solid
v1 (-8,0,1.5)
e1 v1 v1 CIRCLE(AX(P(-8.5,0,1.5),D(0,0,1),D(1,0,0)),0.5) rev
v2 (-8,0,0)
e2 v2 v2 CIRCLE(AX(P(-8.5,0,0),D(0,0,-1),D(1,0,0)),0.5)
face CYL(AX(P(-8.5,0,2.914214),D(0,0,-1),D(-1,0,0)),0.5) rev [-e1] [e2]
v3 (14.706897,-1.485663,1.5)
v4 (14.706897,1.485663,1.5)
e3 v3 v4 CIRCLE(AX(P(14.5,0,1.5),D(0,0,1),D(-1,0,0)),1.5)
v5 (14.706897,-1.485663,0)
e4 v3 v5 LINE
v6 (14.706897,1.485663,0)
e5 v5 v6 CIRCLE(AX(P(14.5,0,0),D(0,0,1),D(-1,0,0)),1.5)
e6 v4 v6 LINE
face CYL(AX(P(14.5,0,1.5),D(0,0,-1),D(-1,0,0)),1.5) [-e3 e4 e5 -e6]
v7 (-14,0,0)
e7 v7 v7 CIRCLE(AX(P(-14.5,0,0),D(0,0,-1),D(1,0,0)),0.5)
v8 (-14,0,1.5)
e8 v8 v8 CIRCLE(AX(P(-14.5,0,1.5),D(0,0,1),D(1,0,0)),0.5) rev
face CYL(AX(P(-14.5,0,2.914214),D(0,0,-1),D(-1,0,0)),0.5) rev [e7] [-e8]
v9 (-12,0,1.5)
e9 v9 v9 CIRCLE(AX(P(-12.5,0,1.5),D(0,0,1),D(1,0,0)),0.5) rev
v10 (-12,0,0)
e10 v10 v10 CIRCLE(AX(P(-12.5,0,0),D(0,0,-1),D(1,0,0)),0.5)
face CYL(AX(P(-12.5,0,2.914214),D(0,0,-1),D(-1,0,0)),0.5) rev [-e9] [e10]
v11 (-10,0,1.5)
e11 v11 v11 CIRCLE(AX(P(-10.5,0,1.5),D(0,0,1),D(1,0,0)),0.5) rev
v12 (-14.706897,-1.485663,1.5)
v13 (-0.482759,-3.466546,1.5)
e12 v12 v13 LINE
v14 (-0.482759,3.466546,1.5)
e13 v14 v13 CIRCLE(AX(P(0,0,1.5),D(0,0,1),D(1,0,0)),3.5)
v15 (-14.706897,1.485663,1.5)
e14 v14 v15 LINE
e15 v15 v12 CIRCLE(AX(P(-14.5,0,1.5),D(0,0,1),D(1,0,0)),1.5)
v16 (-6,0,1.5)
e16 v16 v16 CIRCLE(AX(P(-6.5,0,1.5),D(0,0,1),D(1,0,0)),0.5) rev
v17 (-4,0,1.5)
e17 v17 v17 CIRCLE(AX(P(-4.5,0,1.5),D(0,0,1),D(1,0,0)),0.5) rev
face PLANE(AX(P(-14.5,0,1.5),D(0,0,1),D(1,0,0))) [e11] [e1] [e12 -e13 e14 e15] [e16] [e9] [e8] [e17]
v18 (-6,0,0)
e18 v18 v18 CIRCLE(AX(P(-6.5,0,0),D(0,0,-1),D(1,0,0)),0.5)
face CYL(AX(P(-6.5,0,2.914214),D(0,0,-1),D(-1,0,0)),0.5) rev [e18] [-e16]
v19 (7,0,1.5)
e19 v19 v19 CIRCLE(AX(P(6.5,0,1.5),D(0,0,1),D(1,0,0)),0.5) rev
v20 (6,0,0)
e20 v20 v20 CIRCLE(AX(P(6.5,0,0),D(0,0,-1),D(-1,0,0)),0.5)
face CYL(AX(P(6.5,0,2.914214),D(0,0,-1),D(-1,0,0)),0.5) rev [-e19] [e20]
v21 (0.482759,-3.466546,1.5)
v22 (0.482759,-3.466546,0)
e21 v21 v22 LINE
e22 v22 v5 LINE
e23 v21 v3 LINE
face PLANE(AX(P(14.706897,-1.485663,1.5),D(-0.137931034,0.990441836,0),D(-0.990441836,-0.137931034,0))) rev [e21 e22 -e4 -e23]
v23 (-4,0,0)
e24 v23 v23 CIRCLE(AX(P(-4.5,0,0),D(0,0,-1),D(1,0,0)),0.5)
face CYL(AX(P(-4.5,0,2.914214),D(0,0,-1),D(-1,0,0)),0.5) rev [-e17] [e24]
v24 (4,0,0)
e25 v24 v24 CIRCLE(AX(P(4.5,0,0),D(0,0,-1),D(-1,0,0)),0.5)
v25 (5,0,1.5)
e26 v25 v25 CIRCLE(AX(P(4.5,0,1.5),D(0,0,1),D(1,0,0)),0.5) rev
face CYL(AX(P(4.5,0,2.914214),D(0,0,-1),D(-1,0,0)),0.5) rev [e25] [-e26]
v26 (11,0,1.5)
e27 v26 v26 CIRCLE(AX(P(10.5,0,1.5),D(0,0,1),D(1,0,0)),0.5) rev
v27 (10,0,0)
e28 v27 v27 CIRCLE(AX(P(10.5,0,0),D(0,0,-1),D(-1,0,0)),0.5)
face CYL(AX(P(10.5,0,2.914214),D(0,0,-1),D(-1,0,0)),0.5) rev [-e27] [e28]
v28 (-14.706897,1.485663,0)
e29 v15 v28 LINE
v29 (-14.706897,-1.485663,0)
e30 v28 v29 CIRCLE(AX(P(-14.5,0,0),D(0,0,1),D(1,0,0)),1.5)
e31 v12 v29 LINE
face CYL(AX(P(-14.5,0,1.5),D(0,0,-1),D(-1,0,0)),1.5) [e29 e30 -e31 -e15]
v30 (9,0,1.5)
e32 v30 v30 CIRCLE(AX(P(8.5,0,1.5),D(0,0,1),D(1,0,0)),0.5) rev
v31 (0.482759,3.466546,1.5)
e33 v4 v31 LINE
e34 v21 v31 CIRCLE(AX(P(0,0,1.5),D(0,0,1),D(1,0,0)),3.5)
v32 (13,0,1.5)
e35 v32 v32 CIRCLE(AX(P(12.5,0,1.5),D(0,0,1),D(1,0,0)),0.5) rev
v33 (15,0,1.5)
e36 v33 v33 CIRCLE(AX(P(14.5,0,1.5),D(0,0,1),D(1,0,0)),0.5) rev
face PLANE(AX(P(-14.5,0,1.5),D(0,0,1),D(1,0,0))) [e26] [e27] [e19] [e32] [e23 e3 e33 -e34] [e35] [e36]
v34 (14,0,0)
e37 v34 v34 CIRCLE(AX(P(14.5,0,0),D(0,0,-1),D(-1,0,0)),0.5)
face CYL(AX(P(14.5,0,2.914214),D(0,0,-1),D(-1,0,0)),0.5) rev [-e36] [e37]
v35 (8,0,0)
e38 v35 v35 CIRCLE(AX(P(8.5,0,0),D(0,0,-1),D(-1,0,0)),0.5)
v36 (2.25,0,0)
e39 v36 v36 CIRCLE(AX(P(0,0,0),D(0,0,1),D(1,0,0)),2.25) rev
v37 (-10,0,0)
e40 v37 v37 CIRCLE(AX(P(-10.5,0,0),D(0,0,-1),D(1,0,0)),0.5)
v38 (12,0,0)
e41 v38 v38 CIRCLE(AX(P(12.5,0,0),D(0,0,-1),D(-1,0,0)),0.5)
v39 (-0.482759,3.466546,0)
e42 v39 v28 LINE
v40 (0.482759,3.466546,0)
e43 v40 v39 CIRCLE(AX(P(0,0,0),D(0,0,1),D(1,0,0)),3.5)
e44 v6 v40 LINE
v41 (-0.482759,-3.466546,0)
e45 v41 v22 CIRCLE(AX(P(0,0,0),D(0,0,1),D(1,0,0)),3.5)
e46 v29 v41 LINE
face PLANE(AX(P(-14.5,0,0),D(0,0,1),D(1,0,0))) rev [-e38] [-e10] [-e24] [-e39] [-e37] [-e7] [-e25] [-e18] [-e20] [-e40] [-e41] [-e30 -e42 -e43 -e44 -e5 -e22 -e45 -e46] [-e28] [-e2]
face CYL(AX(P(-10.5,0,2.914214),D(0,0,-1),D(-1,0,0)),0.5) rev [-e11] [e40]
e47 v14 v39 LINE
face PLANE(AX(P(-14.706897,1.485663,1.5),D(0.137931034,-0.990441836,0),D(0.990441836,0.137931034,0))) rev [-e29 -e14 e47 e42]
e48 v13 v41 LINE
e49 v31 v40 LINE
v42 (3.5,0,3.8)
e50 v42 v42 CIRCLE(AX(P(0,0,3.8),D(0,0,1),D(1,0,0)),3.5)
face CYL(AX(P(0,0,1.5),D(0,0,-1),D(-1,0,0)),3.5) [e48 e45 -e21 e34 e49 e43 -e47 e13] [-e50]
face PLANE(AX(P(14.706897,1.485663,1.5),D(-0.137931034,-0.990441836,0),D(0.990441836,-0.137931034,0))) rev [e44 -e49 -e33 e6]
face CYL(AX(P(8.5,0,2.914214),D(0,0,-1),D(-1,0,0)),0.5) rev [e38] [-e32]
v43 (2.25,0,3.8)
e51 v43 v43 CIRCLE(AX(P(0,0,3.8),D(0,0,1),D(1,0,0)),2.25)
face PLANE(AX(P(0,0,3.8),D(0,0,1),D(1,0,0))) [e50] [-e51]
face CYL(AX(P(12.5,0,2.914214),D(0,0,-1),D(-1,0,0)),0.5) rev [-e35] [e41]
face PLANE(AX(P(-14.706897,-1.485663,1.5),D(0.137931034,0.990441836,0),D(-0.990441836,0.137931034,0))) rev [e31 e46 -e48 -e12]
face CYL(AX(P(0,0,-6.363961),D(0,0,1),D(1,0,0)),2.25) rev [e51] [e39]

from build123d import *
from build123d.topology import SkipClean

# Parameters (mm, degrees)
EXTRUDE_1_DEPTH     = 1.5
SKETCH_2_R          = 3.5
EXTRUDE_2_DEPTH     = 2.3
SKETCH_3_R          = 2.25
CUT_EXTRUDE_1_DEPTH = 3.8
SKETCH_5_R          = 0.5
CUT_EXTRUDE_2_DEPTH = 1.5


with BuildPart() as part:
    # 草图1 → 凸台-拉伸1 (new body)
    with BuildSketch(Plane.XY):
        with BuildLine():
            Line((-14.706896552, 1.485662753), (-0.482758621, 3.466546425))
            ThreePointArc((-0.482758621, 3.466546425), (0, 3.5), (0.482758621, 3.466546425))
            Line((0.482758621, 3.466546425), (14.706896552, 1.485662753))
            ThreePointArc((14.706896552, 1.485662753), (16, 0), (14.706896552, -1.485662753))
            Line((14.706896552, -1.485662753), (0.482758621, -3.466546425))
            ThreePointArc((0.482758621, -3.466546425), (0, -3.5), (-0.482758621, -3.466546425))
            Line((-0.482758621, -3.466546425), (-14.706896552, -1.485662753))
            ThreePointArc((-14.706896552, -1.485662753), (-16, 0), (-14.706896552, 1.485662753))
        make_face()
    extrude(amount=EXTRUDE_1_DEPTH)

    # 草图2 → 凸台-拉伸2 (add)
    with SkipClean():  # the faces are left unmerged after this step: merging them gives an invalid solid
        with BuildSketch(Plane.XY.offset(1.5)):
            with Locations(Location((0, 0, 0), (0, 0, 97.928141766))):
                Circle(SKETCH_2_R)
        extrude(amount=EXTRUDE_2_DEPTH)
    add(part.part.scale(1), mode=Mode.REPLACE)  # the faces are merged on a copy

    # 草图3 → 切除-拉伸1 (cut)
    with BuildSketch(Plane.XY.offset(3.8)):
        Circle(SKETCH_3_R)
    extrude(amount=-CUT_EXTRUDE_1_DEPTH, mode=Mode.SUBTRACT)

    # 草图5 → 切除-拉伸2 (cut)
    with BuildSketch(Plane(origin=(0, 0, 0), x_dir=(-1, 0, 0), z_dir=(0, 0, -1))):
        with Locations((-4.5, 0)):
            Circle(SKETCH_5_R)
        with Locations((-6.5, 0)):
            Circle(SKETCH_5_R)
        with Locations((-8.5, 0)):
            Circle(SKETCH_5_R)
        with Locations((-10.5, 0)):
            Circle(SKETCH_5_R)
        with Locations((-12.5, 0)):
            Circle(SKETCH_5_R)
        with Locations((-14.5, 0)):
            Circle(SKETCH_5_R)
        with Locations(Location((4.5, 0, 0), (0, 0, 180))):
            Circle(SKETCH_5_R)
        with Locations(Location((14.5, 0, 0), (0, 0, 180))):
            Circle(SKETCH_5_R)
        with Locations(Location((12.5, 0, 0), (0, 0, 180))):
            Circle(SKETCH_5_R)
        with Locations(Location((10.5, 0, 0), (0, 0, 180))):
            Circle(SKETCH_5_R)
        with Locations(Location((8.5, 0, 0), (0, 0, 180))):
            Circle(SKETCH_5_R)
        with Locations(Location((6.5, 0, 0), (0, 0, 180))):
            Circle(SKETCH_5_R)
    extrude(amount=-CUT_EXTRUDE_2_DEPTH, mode=Mode.SUBTRACT)


solid = part.part
